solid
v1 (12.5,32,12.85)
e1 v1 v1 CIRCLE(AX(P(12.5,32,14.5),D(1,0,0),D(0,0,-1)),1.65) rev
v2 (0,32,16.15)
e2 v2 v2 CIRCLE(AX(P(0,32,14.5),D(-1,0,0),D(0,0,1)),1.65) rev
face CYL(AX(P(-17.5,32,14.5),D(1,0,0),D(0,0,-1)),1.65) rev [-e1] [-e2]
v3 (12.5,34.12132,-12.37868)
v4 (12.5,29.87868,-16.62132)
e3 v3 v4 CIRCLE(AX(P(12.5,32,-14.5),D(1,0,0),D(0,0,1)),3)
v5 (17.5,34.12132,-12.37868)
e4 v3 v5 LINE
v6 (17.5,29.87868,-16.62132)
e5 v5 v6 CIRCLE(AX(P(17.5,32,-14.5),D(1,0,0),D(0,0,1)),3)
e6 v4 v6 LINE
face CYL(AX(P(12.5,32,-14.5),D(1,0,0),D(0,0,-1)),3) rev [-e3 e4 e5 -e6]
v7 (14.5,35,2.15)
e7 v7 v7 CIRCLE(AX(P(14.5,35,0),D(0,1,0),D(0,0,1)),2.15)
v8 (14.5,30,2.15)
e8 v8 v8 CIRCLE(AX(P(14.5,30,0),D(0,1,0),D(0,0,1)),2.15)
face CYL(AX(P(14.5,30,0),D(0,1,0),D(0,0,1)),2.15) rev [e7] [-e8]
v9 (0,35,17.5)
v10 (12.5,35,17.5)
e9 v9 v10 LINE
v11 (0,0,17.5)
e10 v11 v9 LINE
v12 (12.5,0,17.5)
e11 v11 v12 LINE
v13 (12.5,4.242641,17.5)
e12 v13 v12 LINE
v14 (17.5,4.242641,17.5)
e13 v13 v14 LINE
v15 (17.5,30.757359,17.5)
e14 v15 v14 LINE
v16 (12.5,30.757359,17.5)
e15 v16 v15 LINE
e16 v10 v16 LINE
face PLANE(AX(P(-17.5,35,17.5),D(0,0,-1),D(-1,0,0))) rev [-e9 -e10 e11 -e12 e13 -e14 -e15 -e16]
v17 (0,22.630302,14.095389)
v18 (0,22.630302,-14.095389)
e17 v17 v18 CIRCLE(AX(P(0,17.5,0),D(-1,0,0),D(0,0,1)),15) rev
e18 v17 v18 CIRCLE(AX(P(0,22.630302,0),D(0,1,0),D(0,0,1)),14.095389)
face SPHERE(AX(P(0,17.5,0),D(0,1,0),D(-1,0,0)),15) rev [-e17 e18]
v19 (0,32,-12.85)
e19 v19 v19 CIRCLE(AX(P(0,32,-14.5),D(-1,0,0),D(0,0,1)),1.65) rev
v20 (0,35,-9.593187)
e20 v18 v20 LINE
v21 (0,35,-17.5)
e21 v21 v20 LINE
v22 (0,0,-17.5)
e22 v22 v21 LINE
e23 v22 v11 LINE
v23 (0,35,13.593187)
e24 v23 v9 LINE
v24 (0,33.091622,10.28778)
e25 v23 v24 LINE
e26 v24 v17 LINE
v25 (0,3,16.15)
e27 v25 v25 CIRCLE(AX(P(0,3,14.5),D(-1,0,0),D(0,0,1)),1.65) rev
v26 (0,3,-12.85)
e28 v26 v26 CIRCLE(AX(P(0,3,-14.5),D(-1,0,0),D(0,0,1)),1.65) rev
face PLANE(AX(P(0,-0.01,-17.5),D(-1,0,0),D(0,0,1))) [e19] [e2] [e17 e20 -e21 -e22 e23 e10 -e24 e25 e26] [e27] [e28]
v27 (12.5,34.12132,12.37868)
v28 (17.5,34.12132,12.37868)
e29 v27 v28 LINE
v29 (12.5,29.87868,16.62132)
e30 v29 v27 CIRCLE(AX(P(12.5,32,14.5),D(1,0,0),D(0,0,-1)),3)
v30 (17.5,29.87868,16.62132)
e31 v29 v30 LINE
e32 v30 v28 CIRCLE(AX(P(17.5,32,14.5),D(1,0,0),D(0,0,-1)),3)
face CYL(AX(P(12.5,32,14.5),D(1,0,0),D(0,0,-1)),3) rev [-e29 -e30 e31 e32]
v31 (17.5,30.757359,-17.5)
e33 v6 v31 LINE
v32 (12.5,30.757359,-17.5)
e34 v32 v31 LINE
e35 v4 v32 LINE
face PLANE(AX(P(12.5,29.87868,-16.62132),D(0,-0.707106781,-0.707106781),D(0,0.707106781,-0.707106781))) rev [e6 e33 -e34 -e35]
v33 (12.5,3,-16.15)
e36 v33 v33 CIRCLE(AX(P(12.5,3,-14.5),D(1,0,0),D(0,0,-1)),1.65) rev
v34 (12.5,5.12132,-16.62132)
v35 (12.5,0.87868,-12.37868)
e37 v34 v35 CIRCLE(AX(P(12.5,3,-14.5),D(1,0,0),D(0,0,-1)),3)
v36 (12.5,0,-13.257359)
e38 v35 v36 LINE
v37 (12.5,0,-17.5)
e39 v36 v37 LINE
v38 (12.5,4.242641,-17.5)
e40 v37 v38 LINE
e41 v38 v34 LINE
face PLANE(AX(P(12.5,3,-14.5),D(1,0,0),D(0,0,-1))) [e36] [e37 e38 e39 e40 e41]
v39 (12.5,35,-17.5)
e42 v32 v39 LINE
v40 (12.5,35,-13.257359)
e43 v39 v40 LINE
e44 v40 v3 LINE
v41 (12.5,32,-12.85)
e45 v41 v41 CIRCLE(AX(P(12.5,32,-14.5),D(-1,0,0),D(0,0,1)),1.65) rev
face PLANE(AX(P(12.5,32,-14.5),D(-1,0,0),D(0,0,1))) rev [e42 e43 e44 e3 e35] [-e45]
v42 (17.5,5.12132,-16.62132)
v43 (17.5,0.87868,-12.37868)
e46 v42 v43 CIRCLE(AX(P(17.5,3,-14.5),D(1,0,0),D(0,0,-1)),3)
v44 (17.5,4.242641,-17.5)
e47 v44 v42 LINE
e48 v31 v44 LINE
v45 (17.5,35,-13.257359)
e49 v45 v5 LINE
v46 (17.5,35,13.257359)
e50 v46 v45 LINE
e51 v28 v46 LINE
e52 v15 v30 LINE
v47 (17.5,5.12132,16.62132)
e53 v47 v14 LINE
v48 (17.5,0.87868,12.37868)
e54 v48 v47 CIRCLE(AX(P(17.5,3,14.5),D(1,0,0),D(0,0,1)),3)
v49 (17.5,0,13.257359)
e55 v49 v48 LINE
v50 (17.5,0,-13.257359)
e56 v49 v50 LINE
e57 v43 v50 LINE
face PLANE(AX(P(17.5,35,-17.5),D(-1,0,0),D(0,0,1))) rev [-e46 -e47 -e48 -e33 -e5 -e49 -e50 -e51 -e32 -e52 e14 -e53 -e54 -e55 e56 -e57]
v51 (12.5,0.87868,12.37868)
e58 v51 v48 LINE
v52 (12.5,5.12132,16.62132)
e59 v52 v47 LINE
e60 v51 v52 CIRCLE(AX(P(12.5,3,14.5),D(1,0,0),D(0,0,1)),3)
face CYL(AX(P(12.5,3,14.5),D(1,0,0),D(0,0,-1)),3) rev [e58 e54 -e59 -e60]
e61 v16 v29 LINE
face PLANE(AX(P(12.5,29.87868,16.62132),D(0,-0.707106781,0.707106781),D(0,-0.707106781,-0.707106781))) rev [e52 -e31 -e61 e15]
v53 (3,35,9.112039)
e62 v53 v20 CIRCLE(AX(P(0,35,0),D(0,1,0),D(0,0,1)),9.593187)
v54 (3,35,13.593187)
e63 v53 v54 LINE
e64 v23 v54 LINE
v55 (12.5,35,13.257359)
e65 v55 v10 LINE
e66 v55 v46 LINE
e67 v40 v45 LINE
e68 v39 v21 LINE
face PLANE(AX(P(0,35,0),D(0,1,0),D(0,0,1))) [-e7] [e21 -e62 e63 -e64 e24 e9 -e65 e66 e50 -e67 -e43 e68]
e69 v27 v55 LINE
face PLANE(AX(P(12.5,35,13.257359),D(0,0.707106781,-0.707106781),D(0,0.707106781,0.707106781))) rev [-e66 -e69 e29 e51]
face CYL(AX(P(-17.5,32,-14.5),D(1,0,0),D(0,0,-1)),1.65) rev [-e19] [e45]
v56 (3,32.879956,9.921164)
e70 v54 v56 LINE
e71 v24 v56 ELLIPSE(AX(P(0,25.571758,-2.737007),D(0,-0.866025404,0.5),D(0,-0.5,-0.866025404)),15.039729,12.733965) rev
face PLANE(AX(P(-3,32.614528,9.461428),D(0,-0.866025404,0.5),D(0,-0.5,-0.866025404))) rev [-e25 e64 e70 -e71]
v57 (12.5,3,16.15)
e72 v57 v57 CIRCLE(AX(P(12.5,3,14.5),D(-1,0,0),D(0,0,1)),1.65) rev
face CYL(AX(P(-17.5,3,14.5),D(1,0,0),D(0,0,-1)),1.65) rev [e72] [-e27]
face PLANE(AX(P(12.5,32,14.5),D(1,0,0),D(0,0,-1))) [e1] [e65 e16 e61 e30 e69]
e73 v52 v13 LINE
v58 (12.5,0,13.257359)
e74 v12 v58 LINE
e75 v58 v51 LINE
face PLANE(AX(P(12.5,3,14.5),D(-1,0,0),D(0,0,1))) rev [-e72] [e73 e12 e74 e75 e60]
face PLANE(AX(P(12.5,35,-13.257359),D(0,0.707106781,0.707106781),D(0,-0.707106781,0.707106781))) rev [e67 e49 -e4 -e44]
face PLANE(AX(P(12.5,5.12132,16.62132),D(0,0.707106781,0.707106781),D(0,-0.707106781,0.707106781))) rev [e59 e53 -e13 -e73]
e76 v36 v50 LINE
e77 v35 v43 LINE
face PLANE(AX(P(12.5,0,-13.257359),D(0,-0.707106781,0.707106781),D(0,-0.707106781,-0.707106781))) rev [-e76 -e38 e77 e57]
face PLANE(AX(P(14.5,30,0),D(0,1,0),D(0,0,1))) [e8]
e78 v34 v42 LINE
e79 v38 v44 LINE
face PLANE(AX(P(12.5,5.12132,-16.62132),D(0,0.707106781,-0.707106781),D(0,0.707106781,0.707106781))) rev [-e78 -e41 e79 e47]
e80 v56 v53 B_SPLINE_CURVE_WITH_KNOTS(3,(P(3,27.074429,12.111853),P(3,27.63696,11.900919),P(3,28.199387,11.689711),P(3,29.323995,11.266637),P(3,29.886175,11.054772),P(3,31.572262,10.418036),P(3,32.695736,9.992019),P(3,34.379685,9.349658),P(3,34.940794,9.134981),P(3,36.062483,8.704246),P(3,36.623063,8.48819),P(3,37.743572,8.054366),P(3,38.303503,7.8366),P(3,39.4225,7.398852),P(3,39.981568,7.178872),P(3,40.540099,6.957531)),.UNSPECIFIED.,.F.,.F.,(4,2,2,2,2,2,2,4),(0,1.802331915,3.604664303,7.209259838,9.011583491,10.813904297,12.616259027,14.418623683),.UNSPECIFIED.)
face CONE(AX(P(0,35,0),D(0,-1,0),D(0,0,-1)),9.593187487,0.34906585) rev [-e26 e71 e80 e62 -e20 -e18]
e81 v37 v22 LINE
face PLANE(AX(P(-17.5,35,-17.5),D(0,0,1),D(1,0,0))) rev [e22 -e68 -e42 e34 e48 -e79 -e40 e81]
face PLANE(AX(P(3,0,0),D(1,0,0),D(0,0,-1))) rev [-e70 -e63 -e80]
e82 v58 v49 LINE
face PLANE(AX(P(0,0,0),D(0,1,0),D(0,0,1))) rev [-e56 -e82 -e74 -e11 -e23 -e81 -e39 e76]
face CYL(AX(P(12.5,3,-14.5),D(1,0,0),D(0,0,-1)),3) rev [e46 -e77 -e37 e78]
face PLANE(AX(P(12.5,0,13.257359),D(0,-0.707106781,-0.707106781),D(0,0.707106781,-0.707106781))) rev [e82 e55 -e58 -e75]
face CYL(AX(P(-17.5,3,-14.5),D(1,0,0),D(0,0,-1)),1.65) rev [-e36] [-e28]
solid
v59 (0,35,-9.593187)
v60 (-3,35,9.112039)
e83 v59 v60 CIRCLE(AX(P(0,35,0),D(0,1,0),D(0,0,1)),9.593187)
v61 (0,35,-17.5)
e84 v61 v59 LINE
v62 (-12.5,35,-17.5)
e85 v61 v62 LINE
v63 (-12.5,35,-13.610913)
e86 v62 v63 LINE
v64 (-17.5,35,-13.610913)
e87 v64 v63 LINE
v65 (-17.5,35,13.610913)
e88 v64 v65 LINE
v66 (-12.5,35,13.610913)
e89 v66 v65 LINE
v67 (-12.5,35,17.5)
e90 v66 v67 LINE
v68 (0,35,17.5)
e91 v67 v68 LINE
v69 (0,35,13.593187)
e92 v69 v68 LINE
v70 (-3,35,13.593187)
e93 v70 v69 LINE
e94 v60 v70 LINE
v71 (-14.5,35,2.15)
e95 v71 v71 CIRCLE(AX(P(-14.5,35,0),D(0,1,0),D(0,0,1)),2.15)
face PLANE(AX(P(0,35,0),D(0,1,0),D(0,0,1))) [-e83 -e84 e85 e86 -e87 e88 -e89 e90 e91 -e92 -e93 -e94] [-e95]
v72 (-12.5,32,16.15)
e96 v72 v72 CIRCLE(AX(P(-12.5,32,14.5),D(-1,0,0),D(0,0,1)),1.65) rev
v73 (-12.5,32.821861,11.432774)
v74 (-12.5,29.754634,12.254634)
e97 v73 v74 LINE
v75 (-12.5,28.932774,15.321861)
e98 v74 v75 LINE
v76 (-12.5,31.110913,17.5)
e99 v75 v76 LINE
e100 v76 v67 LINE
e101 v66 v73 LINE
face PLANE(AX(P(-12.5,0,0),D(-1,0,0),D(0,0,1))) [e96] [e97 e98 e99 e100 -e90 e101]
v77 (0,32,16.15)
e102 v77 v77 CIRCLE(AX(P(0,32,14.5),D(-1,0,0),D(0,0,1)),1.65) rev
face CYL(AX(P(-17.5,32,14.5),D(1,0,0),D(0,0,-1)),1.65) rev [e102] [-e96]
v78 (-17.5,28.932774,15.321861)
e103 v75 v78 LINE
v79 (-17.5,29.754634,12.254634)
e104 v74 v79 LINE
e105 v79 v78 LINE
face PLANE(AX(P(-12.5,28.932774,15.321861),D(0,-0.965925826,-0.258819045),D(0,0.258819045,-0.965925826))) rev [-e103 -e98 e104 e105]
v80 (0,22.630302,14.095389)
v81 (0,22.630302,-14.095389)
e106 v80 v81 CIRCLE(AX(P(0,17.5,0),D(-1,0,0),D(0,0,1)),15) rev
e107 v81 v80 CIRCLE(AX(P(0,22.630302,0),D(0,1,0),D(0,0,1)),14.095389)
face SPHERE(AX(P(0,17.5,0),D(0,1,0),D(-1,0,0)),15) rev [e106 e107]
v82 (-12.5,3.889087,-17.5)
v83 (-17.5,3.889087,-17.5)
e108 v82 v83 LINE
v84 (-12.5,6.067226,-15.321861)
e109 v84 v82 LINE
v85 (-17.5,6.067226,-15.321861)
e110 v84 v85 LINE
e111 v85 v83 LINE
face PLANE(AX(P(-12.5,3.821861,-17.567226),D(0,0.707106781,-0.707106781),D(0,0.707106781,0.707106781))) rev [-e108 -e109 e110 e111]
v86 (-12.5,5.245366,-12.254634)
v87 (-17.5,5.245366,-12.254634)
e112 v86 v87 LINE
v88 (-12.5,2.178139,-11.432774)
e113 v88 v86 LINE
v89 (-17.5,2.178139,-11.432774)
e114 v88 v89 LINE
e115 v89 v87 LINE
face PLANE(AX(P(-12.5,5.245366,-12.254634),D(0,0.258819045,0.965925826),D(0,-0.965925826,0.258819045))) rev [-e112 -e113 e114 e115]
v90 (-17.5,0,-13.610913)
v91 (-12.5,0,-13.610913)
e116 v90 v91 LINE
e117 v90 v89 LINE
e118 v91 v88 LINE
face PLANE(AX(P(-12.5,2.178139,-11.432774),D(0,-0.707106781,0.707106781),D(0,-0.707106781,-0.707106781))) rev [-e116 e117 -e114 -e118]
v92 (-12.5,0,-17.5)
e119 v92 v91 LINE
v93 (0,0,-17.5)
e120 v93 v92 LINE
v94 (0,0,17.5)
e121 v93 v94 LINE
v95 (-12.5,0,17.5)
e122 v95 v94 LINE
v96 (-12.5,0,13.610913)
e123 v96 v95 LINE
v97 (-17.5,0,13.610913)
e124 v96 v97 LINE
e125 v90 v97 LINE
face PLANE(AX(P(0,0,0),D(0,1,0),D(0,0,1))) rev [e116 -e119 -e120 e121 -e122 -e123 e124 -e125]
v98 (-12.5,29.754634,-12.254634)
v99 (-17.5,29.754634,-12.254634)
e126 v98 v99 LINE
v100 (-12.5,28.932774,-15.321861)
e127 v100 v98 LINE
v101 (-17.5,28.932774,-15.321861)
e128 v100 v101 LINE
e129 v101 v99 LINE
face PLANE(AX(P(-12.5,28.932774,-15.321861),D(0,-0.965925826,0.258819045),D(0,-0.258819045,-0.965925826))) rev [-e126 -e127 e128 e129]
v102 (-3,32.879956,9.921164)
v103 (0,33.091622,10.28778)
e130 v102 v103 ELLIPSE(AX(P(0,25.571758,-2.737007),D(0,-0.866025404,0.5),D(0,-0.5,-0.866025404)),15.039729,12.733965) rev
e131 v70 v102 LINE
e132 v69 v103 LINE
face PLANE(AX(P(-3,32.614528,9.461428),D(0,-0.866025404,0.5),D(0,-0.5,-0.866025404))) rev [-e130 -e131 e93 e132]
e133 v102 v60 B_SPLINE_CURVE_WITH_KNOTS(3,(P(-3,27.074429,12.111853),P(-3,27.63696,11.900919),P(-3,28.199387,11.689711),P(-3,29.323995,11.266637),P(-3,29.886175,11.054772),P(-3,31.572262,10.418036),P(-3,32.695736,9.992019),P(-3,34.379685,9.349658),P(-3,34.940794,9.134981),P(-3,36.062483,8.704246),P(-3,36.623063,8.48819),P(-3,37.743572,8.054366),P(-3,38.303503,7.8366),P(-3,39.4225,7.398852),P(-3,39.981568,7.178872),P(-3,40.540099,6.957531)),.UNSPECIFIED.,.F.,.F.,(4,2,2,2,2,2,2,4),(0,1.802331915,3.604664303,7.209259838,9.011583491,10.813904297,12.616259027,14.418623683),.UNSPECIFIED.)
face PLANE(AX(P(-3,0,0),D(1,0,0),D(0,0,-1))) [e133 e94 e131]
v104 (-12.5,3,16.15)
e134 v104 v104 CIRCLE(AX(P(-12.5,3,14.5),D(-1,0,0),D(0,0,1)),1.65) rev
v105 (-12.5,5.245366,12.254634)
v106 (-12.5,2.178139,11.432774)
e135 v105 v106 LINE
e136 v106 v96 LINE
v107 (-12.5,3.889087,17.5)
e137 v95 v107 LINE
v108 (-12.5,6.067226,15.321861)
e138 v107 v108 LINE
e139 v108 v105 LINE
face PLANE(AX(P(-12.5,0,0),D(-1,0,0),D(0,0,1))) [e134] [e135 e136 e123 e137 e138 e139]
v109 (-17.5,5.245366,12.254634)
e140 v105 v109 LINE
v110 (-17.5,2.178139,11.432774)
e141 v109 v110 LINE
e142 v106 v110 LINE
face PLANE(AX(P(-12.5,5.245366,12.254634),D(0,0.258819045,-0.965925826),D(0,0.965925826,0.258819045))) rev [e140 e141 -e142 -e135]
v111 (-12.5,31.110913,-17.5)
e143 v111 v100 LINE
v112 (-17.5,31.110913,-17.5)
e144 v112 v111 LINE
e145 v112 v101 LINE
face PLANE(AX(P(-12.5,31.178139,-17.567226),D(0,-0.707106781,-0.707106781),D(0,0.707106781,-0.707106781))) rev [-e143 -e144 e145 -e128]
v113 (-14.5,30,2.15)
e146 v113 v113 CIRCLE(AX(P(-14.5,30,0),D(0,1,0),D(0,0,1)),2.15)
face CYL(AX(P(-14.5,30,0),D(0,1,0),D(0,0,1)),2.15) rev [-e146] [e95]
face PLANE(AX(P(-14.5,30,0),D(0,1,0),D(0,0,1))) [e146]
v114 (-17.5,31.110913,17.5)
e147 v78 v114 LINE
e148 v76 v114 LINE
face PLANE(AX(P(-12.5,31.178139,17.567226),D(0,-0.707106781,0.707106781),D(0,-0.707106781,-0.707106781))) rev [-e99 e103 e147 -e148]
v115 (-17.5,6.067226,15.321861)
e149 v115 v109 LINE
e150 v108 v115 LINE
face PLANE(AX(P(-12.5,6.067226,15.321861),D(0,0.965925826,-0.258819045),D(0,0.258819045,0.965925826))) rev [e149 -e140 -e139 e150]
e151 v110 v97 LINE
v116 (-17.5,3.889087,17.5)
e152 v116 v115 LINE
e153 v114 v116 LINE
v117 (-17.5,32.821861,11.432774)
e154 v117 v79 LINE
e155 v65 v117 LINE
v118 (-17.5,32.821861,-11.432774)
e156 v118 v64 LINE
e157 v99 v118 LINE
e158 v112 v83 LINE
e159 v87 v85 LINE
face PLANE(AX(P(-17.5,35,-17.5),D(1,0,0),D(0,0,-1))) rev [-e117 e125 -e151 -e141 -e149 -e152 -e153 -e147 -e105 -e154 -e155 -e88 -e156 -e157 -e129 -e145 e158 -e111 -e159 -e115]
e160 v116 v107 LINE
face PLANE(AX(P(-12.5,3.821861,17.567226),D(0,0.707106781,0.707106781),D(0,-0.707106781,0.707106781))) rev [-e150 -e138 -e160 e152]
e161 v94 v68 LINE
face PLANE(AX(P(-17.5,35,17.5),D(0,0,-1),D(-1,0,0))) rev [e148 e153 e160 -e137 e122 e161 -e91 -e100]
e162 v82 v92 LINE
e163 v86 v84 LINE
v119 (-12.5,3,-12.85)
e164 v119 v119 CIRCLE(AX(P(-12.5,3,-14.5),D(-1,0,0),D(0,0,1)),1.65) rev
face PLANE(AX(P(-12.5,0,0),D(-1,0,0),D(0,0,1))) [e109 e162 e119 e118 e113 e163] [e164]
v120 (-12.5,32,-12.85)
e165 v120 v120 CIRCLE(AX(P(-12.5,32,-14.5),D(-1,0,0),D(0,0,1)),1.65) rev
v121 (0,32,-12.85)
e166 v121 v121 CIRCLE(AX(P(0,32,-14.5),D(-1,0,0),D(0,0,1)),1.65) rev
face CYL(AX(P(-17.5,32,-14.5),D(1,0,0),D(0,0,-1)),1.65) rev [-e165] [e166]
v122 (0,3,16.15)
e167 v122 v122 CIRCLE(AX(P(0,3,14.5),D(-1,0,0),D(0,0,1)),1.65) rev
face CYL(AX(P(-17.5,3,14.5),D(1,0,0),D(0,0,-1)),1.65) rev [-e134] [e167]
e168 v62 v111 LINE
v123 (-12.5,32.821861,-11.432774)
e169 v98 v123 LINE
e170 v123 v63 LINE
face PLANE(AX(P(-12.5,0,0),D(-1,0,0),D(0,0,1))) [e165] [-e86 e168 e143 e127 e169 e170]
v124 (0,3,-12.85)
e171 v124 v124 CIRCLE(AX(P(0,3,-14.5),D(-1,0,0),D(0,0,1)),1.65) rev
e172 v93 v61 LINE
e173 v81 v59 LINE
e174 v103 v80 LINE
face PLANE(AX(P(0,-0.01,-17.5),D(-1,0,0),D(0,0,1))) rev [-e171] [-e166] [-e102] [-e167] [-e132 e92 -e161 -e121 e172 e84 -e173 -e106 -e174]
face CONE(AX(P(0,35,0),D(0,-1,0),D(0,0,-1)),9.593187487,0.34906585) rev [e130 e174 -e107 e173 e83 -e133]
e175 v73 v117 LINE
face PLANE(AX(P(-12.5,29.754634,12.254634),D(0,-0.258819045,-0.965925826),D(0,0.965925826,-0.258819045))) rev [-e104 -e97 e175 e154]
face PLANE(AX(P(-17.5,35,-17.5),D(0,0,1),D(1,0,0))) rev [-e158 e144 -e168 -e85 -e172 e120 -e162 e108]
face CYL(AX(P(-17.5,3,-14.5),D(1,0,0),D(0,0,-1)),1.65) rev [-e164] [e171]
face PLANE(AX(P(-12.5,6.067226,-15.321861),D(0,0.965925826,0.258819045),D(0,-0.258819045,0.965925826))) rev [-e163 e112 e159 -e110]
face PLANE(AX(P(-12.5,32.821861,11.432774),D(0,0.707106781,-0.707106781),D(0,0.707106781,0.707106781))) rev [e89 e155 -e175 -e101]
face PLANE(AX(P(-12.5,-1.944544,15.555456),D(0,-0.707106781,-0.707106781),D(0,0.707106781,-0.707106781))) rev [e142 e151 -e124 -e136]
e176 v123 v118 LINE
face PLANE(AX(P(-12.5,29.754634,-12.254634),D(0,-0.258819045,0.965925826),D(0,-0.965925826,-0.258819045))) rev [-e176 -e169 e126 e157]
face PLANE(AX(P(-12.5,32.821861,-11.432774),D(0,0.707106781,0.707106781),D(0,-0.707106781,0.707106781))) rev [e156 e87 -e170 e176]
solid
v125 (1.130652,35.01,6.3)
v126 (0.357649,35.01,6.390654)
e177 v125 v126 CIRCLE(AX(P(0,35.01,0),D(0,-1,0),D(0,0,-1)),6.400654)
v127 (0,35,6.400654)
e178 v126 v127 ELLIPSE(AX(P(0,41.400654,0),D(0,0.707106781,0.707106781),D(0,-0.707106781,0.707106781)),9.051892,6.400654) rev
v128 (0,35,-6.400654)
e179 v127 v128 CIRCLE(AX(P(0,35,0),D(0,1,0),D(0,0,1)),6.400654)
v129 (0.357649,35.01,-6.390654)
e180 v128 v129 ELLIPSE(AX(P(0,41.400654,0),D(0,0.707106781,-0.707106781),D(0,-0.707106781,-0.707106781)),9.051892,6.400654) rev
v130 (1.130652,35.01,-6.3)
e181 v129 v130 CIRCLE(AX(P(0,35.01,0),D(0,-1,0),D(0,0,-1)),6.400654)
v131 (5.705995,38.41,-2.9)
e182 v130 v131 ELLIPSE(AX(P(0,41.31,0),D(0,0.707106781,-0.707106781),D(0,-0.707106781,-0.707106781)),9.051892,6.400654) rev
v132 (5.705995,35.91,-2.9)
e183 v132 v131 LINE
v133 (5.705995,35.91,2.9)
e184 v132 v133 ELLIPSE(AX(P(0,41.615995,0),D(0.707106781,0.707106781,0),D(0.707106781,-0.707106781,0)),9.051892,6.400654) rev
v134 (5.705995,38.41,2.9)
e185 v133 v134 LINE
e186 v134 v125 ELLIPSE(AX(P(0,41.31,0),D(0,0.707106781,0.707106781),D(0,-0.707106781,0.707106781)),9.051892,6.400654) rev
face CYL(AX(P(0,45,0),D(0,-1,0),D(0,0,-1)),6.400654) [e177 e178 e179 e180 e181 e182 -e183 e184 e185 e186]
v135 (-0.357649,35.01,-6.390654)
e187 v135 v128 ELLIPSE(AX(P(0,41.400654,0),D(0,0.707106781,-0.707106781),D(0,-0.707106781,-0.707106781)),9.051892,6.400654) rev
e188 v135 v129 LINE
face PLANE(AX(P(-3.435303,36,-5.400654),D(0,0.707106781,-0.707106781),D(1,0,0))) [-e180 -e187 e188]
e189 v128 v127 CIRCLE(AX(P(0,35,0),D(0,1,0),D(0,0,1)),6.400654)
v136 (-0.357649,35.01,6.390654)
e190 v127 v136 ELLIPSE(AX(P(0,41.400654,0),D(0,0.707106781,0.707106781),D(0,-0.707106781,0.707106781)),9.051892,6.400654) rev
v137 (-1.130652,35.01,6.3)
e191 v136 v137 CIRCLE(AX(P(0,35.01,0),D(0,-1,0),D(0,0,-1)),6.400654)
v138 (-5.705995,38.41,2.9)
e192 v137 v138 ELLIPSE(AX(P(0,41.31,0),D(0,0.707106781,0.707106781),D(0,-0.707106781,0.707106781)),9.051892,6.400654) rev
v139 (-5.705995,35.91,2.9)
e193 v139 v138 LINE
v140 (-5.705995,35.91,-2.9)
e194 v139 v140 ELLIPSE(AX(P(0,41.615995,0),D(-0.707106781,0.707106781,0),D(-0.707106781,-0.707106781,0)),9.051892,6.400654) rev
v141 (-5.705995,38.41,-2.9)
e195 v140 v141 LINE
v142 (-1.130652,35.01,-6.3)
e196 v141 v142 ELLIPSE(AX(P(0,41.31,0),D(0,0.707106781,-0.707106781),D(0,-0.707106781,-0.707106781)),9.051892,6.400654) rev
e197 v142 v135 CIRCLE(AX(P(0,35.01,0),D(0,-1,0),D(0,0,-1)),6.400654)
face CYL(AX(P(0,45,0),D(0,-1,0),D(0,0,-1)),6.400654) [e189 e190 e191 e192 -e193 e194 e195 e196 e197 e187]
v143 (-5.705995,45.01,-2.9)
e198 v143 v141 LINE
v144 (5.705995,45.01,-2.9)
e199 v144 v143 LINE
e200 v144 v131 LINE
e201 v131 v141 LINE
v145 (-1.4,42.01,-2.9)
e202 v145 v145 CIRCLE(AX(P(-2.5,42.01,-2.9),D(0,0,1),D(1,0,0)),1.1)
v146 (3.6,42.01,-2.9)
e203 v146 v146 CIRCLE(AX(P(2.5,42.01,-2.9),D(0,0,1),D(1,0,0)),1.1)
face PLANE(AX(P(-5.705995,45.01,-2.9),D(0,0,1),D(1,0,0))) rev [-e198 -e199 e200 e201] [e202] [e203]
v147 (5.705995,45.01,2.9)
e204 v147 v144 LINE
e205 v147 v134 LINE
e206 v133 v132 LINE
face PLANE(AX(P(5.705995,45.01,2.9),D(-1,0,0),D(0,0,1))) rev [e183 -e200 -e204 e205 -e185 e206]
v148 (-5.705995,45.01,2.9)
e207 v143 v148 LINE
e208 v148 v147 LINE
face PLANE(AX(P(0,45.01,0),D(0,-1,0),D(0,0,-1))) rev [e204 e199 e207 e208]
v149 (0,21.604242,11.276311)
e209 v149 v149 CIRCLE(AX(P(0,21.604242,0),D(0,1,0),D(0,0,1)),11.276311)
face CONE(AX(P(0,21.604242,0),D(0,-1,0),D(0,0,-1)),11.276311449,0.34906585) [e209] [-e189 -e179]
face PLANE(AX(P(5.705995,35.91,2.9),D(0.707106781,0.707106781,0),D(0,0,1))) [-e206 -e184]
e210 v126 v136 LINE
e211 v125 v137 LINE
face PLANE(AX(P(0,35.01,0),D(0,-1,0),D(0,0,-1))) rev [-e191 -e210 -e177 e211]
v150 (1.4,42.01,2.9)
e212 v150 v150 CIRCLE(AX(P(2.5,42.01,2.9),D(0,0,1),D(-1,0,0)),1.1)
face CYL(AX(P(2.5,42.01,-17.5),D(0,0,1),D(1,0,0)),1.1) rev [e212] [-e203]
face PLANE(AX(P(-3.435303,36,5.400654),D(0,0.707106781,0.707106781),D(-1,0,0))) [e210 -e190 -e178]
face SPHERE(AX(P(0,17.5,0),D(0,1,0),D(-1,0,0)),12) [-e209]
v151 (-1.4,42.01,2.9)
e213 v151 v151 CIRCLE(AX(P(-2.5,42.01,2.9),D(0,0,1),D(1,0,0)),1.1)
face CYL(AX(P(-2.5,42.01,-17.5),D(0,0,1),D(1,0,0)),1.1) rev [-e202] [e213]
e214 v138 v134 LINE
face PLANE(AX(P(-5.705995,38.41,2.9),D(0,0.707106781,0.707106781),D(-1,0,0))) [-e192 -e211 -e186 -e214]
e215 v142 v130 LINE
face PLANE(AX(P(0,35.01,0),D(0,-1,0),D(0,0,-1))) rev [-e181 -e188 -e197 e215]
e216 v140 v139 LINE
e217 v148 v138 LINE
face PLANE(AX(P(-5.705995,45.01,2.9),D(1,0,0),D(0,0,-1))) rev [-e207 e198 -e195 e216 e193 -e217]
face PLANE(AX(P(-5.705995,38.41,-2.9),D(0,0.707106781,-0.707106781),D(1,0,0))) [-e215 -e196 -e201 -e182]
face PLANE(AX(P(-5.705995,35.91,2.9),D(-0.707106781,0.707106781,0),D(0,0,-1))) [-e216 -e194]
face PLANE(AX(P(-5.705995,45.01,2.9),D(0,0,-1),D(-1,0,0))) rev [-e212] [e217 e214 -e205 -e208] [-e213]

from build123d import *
from build123d.topology import SkipClean

# Parameters (mm, degrees)
BOSS_EXTRUDE1_DEPTH = 35
BOSS_EXTRUDE2_DEPTH = 10
CHAMFER1_SIZE       = 1
BOSS_EXTRUDE3_DEPTH = 10.80130834
SKETCH9_R           = 1.6500000000000006
SKETCH9_R_2         = 1.6499999999999986
CUT_EXTRUDE1_DEPTH  = 9.99
BOSS_EXTRUDE5_DEPTH = 9.99
CUT_EXTRUDE3_DEPTH  = 3
SKETCH12_R          = 1.6500000000000001
SKETCH12_R_2        = 1.6499999999999986
SKETCH12_R_3        = 1.6500000000000006
SKETCH12_R_4        = 1.6500000000000024
CUT_EXTRUDE4_DEPTH  = 60.634302209382824
CUT_EXTRUDE5_DEPTH  = 5
CUT_EXTRUDE6_DEPTH  = 5
SKETCH15_R          = 2.1499999999999995
SKETCH15_R_2        = 2.1499999999999977
CUT_EXTRUDE7_DEPTH  = 5
SKETCH17_R          = 18.633796548331432
CUT_EXTRUDE9_DEPTH  = 43.874235853248756
SKETCH18_W          = 11.4119890999963
SKETCH18_H          = 5.800000000000001
BOSS_EXTRUDE6_DEPTH = 10
CHAMFER2_SIZE       = 0.9
CHAMFER3_SIZE       = 3.4
SKETCH19_R          = 1.0999999999999992
CUT_EXTRUDE10_DEPTH = 53.424327368121766


# Read off the part's stored shape, not the designer's step: Split1
with BuildPart() as part:
    # Sketch1 → Boss-Extrude1 (new body)
    with BuildSketch(Plane(origin=(0, 0, 0), x_dir=(1, 0, 0), z_dir=(0, 1, 0))):
        Polygon((-17.500000000000004, 17.5), (17.499999999999996, 17.5), (17.5, -17.5), (-17.5, -17.5), align=None)
    extrude(amount=BOSS_EXTRUDE1_DEPTH)

    # Sketch4 → Cut-Revolve2 (revolve, cut)
    with BuildSketch(Plane.XY, mode=Mode.PRIVATE) as cut_revolve2_sk:
        with BuildLine():
            Line((-6.74e-15, 32.5), (3.06e-15, 2.5000000000000004))
            ThreePointArc((3.06e-15, 2.5000000000000004), (-12.287280664334899, 8.896353454734333), (-14.095389311788608, 22.63030214988509))
            Line((-14.095389311788608, 22.63030214988509), (-9.593187487480089, 35))
            Line((-9.593187487480089, 35), (0, 35))
            Line((0, 35), (-6.74e-15, 32.5))
        make_face()
    revolve(cut_revolve2_sk.sketch.rotate(Axis((0, 36.75000000000001, 0), (0, -1, 0)), 270), axis=Axis((0, 36.75000000000001, 0), (0, -1, 0)), mode=Mode.SUBTRACT)

    # Sketch11 → Cut-Extrude3 (cut, symmetric)
    with BuildSketch(Plane(origin=(0, 0, 0), x_dir=(0, 0, -1), z_dir=(1, 0, 0))):
        Polygon((-13.59318748748009, 35), (-8.59318748748009, 35), (-9.46142837581474, 32.61452776465336), align=None)
    extrude(amount=CUT_EXTRUDE3_DEPTH, both=True, mode=Mode.SUBTRACT)

    # Sketch12 → Cut-Extrude4 (cut, through all)
    with BuildSketch(Plane(origin=(17.5, 0, -1.73e-15), x_dir=(-2.8e-16, 0, -1), z_dir=(1, 0, -2.8e-16))):
        with Locations((-14.499999999999998, 32)):
            Circle(SKETCH12_R)
        with Locations(Location((14.499999999999998, 32, 0), (0, 0, 180))):
            Circle(SKETCH12_R_2)
        with Locations((-14.500000000000005, 2.9999999999999956)):
            Circle(SKETCH12_R_3)
        with Locations(Location((14.500000000000005, 2.9999999999999956, 0), (0, 0, 180))):
            Circle(SKETCH12_R_4)
    extrude(amount=-CUT_EXTRUDE4_DEPTH, mode=Mode.SUBTRACT)

    # Sketch13 → Cut-Extrude5 (cut)
    with BuildSketch(Plane(origin=(17.5, 0, -1.73e-15), x_dir=(-2.8e-16, 0, -1), z_dir=(1, 0, -2.8e-16))):
        with BuildLine():
            Line((-16.621320343559642, 29.878679656440358), (-17.5, 30.75735931288072))
            Line((-17.5, 30.75735931288072), (-17.5, 35))
            Line((-17.5, 35), (-13.257359312880714, 35))
            Line((-13.257359312880714, 35), (-12.378679656440353, 34.121320343559645))
            ThreePointArc((-12.378679656440353, 34.121320343559645), (-12.378679656440356, 29.878679656440358), (-16.621320343559642, 29.878679656440358))
        make_face()
        with BuildLine():
            Line((-13.257359312880714, 0), (-12.378679656440353, 0.8786796564403607))
            ThreePointArc((-12.378679656440353, 0.8786796564403607), (-12.378679656440356, 5.121320343559647), (-16.621320343559642, 5.121320343559645))
            Line((-16.621320343559642, 5.121320343559645), (-17.5, 4.242640687119284))
            Line((-17.5, 4.242640687119284), (-17.5, 0))
            Line((-17.5, 0), (-13.257359312880714, 0))
        make_face()
        with BuildLine():
            Line((16.621320343559642, 29.878679656440358), (17.5, 30.75735931288072))
            Line((17.5, 30.75735931288072), (17.5, 35))
            Line((17.5, 35), (13.257359312880714, 35))
            Line((13.257359312880714, 35), (12.378679656440353, 34.121320343559645))
            ThreePointArc((12.378679656440353, 34.121320343559645), (12.378679656440355, 29.878679656440358), (16.621320343559642, 29.878679656440358))
        make_face()
        with BuildLine():
            Line((16.621320343559642, 5.121320343559645), (17.5, 4.242640687119284))
            Line((17.5, 4.242640687119284), (17.5, 0))
            Line((17.5, 0), (13.257359312880714, 0))
            Line((13.257359312880714, 0), (12.378679656440353, 0.8786796564403607))
            ThreePointArc((12.378679656440353, 0.8786796564403607), (12.378679656440356, 5.121320343559647), (16.621320343559642, 5.121320343559645))
        make_face()
    extrude(amount=-CUT_EXTRUDE5_DEPTH, mode=Mode.SUBTRACT)

    # Sketch14 → Cut-Extrude6 (cut)
    with BuildSketch(Plane.ZY.offset(17.5)):
        Polygon((-17.56722644703862, 31.17813915051261), (-15.321860849487372, 28.93277355296138), (-12.254634402448755, 29.754634402448765), (-11.432773552961383, 32.821860849487386), (-13.678139150512607, 35.06722644703862), (-15.555456351737007, 36.94454364826299), (-19.444543648263, 33.05545635173699), align=None)
        Polygon((-19.444543648263, 1.9445436482630112), (-15.555456351737007, -1.9445436482629967), (-13.678139150512637, -0.06722644703862496), (-11.432773552961358, 2.1781391505126066), (-12.254634402448742, 5.245365597551246), (-15.321860849487372, 6.0672264470386255), (-17.56722644703862, 3.8218608494873934), align=None)
        Polygon((17.56722644703862, 3.8218608494873934), (19.444543648263, 1.9445436482630127), (15.555456351737007, -1.9445436482629919), (13.678139150512637, -0.06722644703862496), (11.432773552961383, 2.1781391505126186), (12.254634402448755, 5.245365597551239), (15.321860849487372, 6.067226447038624), align=None)
        Polygon((19.444543648263, 33.05545635173699), (15.555456351737007, 36.94454364826299), (13.678139150512637, 35.06722644703863), (11.432773552961383, 32.821860849487386), (12.254634402448755, 29.754634402448765), (15.321860849487372, 28.93277355296138), (17.56722644703862, 31.17813915051261), align=None)
    extrude(amount=-CUT_EXTRUDE6_DEPTH, mode=Mode.SUBTRACT)

    # Sketch15 → Cut-Extrude7 (cut)
    with BuildSketch(Plane(origin=(0, 35, 0), x_dir=(1, 0, 0), z_dir=(0, 1, 0))):
        with Locations(Location((-14.500000000000005, 0, 0), (0, 0, 270))):
            Circle(SKETCH15_R)
        with Locations(Location((14.500000000000005, 0, 0), (0, 0, 270))):
            Circle(SKETCH15_R_2)
    extrude(amount=-CUT_EXTRUDE7_DEPTH, mode=Mode.SUBTRACT)


with BuildPart() as body_2:
    # Sketch5 → Revolve1 (revolve)
    with BuildSketch(Plane.XY):
        with BuildLine():
            ThreePointArc((-11.276311449430883, 21.604241719908067), (-10.618754960877792, 11.910541790045011), (-3, 5.881049961377751))
            ThreePointArc((-3, 5.881049961377751), (-1.5120515097927365, 5.595643644794), (2.39e-15, 5.500000000000002))
            Line((2.39e-15, 5.500000000000002), (0, 35))
            Line((0, 35), (-6.400654170052348, 35))
            Line((-6.400654170052348, 35), (-7.492564872850967, 32))
            Line((-7.492564872850967, 32), (-11.276311449430883, 21.604241719908067))
        make_face()
    revolve(axis=Axis((0, 36.75000000000001, 0), (0, -1, 0)))

    # Sketch7 → Boss-Extrude2 (add)
    with BuildSketch(Plane(origin=(0, 35, 0), x_dir=(1, 0, 0), z_dir=(0, 1, 0))):
        with BuildLine():
            Line((-3.4353032384499476, 5.400654170052349), (3.4353032384499493, 5.4006541700523485))
            ThreePointArc((3.4353032384499493, 5.4006541700523485), (6.400654170052353, -4.3e-16), (3.4353032384499493, -5.4006541700523485))
            Line((3.4353032384499493, -5.4006541700523485), (-3.4353032384499476, -5.400654170052349))
            ThreePointArc((-3.4353032384499476, -5.400654170052349), (-6.400654170052346, 3.5e-16), (-3.4353032384499476, 5.400654170052349))
        make_face()
    extrude(amount=BOSS_EXTRUDE2_DEPTH)

    # Chamfer1
    # the kernel refuses this chamfer: 1 mm, written as the material it adds along each edge
    with BuildSketch(Plane(origin=(6.006986226415867, 35, 5.4006541700523485), x_dir=(0, -0.02749587661058907, 0.9996219169112965), z_dir=(-1, 0, 1.3e-16))) as chamfer1_piece_1_section:
        Polygon((CHAMFER1_SIZE * 0.999621916911, CHAMFER1_SIZE * 0.0274958766106), (-CHAMFER1_SIZE * 0.0274958766106, CHAMFER1_SIZE * 0.999621916911), (0, 0), align=None)
    chamfer1_piece_1 = extrude(amount=12.013972452831732, mode=Mode.PRIVATE)
    chamfer1_piece_1 = chamfer1_piece_1 & Plane(origin=(6.22e-15, 35.48065445731911, -2.2e-16), x_dir=(-0.5367112715639589, 0, 0.8437659693162545), z_dir=(0, -1, 0)) * Cylinder(6.400654170052352, 29, mode=Mode.PRIVATE)
    add(chamfer1_piece_1)
    with BuildSketch(Plane(origin=(-6.006986226415865, 35, -5.400654170052349), x_dir=(0, -0.02749587661058907, -0.9996219169112965), z_dir=(1, 0, 1.3e-16))) as chamfer1_piece_2_section:
        Polygon((CHAMFER1_SIZE * 0.999621916911, CHAMFER1_SIZE * 0.0274958766106), (-CHAMFER1_SIZE * 0.0274958766106, CHAMFER1_SIZE * 0.999621916911), (0, 0), align=None)
    chamfer1_piece_2 = extrude(amount=12.013972452831732, mode=Mode.PRIVATE)
    chamfer1_piece_2 = chamfer1_piece_2 & Plane(origin=(6.22e-15, 35.48065445732004, -2.2e-16), x_dir=(-0.5367112715639589, 0, 0.8437659693162545), z_dir=(0, -1, 0)) * Cylinder(6.400654170052352, 29, mode=Mode.PRIVATE)
    add(chamfer1_piece_2)

    # Sketch8 → Boss-Extrude3 (add)
    with BuildSketch(Plane.XY.offset(5.400654170052349)):
        Polygon((17.5, 45.000000000000014), (-17.5, 45.00000000000001), (-17.5, 35.010000000000005), (-9.593187487480089, 35.01000000000001), (-9.593187487480089, 39.00000000000001), (9.593187487480089, 39.00000000000001), (9.593187487480089, 35.01000000000001), (17.5, 35.01000000000001), align=None)
    extrude(amount=-BOSS_EXTRUDE3_DEPTH)

    # Sketch9 → Cut-Extrude1 (cut)
    with BuildSketch(Plane(origin=(0, 45.00000000000001, 0), x_dir=(1, 0, 0), z_dir=(0, 1, 0))):
        with Locations(Location((-14.500000000000005, 0, 0), (0, 0, 270))):
            Circle(SKETCH9_R)
        with Locations(Location((14.500000000000005, 0, 0), (0, 0, 90))):
            Circle(SKETCH9_R_2)
    extrude(amount=-CUT_EXTRUDE1_DEPTH, mode=Mode.SUBTRACT)

    # Sketch10 → Boss-Extrude5 (add)
    with BuildSketch(Plane(origin=(0, 45.00000000000001, 0), x_dir=(1, 0, 0), z_dir=(0, 1, 0))):
        Polygon((-17.500000000000004, 5.4006541700523565), (-9.593187487480089, 5.400654170052356), (-9.593187487480089, 6.4006541700523565), (-17.499999999999996, 6.4006541700523565), align=None)
        Polygon((-17.499999999999996, -6.4006541700523565), (-9.593187487480089, -6.4006541700523565), (-9.593187487480089, -5.400654170052356), (-17.500000000000004, -5.4006541700523565), align=None)
        Polygon((17.500000000000004, -5.4006541700523565), (17.499999999999996, -6.4006541700523565), (9.593187487480089, -6.4006541700523565), (9.593187487480089, -5.400654170052356), align=None)
        Polygon((17.499999999999996, 6.4006541700523565), (9.593187487480089, 6.4006541700523565), (9.593187487480089, 5.400654170052356), (17.500000000000004, 5.4006541700523565), align=None)
    extrude(amount=-BOSS_EXTRUDE5_DEPTH)

    # Sketch17 → Cut-Extrude9 (cut, through all)
    with BuildSketch(Plane.XZ.offset(-35.01000000000001)):
        Circle(SKETCH17_R)
    extrude(amount=-CUT_EXTRUDE9_DEPTH, mode=Mode.SUBTRACT)

    # Sketch18 → Boss-Extrude6 (add)
    with BuildSketch(Plane(origin=(0, 35.01000000000001, 0), x_dir=(1, 0, 0), z_dir=(0, 1, 0))):
        Rectangle(SKETCH18_W, SKETCH18_H)
    extrude(amount=BOSS_EXTRUDE6_DEPTH)

    # Chamfer2
    # the kernel refuses this chamfer: 0.9 mm, written as the material it adds along each edge
    with BuildSketch(Plane(origin=(5.705994549998151, 35.01000000000001, 2.9), x_dir=(-0.027495876610586382, 0.9996219169112966, 0), z_dir=(0, 0, -1))) as chamfer2_piece_1_section:
        Polygon((CHAMFER2_SIZE * 0.999621916911, CHAMFER2_SIZE * 0.0274958766106), (-CHAMFER2_SIZE * 0.0274958766106, CHAMFER2_SIZE * 0.999621916911), (0, 0), align=None)
    chamfer2_piece_1 = extrude(amount=5.8, mode=Mode.PRIVATE)
    chamfer2_piece_1 = chamfer2_piece_1 & Plane(origin=(8.88e-15, 35.351553845275, 0), x_dir=(0.5367112715639574, 0, -0.8437659693162554), z_dir=(0, -1, 0)) * Cylinder(6.400654170052345, 16, mode=Mode.PRIVATE)
    add(chamfer2_piece_1)
    with BuildSketch(Plane(origin=(-5.705994549998149, 35.01000000000001, -2.9), x_dir=(-0.9996219169112966, -0.0274958766105883, 0), z_dir=(0, 0, 1))) as chamfer2_piece_2_section:
        Polygon((CHAMFER2_SIZE * 0.999621916911, -CHAMFER2_SIZE * 0.0274958766106), (-CHAMFER2_SIZE * 0.0274958766106, -CHAMFER2_SIZE * 0.999621916911), (0, 0), align=None)
    chamfer2_piece_2 = extrude(amount=5.8, mode=Mode.PRIVATE)
    chamfer2_piece_2 = chamfer2_piece_2 & Plane(origin=(0, 35.35155387144908, 0), x_dir=(-0.5367112715641034, 0, 0.8437659693161625), z_dir=(0, -1, 0)) * Cylinder(6.400654170052, 16, mode=Mode.PRIVATE)
    add(chamfer2_piece_2)

    # Chamfer3
    # the kernel refuses this chamfer: 3.4 mm, written as the material it adds along each edge
    with BuildSketch(Plane(origin=(14.449716709082246, 35.01000000000001, -2.9), x_dir=(0, 0.9996219169112968, 0.027495876610586365), z_dir=(-1, 0, 0))) as chamfer3_piece_1_section:
        Polygon((CHAMFER3_SIZE * 0.999621916911, CHAMFER3_SIZE * 0.0274958766106), (-CHAMFER3_SIZE * 0.0274958766106, CHAMFER3_SIZE * 0.999621916911), (0, 0), align=None)
    chamfer3_piece_1 = extrude(amount=28.89943341816449, mode=Mode.PRIVATE)
    chamfer3_piece_1 = chamfer3_piece_1 & Plane(origin=(0, 37.40805588236936, 0), x_dir=(-0.5367112715641034, 0, 0.8437659693161625), z_dir=(0, -1, 0)) * Cylinder(6.400654170052, 72, mode=Mode.PRIVATE)
    add(chamfer3_piece_1)
    with BuildSketch(Plane(origin=(-14.449716709082244, 35.01000000000001, 2.9), x_dir=(0, 0.9996219169112968, -0.027495876610586365), z_dir=(1, 0, 0))) as chamfer3_piece_2_section:
        Polygon((CHAMFER3_SIZE * 0.999621916911, CHAMFER3_SIZE * 0.0274958766106), (-CHAMFER3_SIZE * 0.0274958766106, CHAMFER3_SIZE * 0.999621916911), (0, 0), align=None)
    chamfer3_piece_2 = extrude(amount=28.89943341816449, mode=Mode.PRIVATE)
    chamfer3_piece_2 = chamfer3_piece_2 & Plane(origin=(0, 37.40805588270253, 0), x_dir=(-0.5367112715641034, 0, 0.8437659693161625), z_dir=(0, -1, 0)) * Cylinder(6.400654170052, 72, mode=Mode.PRIVATE)
    add(chamfer3_piece_2)

    # Sketch19 → Cut-Extrude10 (cut, through all)
    with SkipClean():  # the faces are left unmerged after this step: merging them gives an invalid solid
        with BuildSketch(Plane.XY.offset(2.9)):
            with Locations((-2.4999999999999853, 42.010000000002044)):
                Circle(SKETCH19_R)
            with Locations((2.499999999999987, 42.010000000002044)):
                Circle(SKETCH19_R)
        extrude(amount=-CUT_EXTRUDE10_DEPTH, mode=Mode.SUBTRACT)


with BuildPart() as body_3:
    # Split1: the piece on the far side of the plane
    add(part.part)
    split(bisect_by=Plane.YZ, keep=Keep.BOTTOM)


with BuildPart() as part_1:
    add(part.part)

    # Split1
    split(bisect_by=Plane.YZ, keep=Keep.TOP)


solid = Compound([body_2.part, body_3.part, part_1.part])
